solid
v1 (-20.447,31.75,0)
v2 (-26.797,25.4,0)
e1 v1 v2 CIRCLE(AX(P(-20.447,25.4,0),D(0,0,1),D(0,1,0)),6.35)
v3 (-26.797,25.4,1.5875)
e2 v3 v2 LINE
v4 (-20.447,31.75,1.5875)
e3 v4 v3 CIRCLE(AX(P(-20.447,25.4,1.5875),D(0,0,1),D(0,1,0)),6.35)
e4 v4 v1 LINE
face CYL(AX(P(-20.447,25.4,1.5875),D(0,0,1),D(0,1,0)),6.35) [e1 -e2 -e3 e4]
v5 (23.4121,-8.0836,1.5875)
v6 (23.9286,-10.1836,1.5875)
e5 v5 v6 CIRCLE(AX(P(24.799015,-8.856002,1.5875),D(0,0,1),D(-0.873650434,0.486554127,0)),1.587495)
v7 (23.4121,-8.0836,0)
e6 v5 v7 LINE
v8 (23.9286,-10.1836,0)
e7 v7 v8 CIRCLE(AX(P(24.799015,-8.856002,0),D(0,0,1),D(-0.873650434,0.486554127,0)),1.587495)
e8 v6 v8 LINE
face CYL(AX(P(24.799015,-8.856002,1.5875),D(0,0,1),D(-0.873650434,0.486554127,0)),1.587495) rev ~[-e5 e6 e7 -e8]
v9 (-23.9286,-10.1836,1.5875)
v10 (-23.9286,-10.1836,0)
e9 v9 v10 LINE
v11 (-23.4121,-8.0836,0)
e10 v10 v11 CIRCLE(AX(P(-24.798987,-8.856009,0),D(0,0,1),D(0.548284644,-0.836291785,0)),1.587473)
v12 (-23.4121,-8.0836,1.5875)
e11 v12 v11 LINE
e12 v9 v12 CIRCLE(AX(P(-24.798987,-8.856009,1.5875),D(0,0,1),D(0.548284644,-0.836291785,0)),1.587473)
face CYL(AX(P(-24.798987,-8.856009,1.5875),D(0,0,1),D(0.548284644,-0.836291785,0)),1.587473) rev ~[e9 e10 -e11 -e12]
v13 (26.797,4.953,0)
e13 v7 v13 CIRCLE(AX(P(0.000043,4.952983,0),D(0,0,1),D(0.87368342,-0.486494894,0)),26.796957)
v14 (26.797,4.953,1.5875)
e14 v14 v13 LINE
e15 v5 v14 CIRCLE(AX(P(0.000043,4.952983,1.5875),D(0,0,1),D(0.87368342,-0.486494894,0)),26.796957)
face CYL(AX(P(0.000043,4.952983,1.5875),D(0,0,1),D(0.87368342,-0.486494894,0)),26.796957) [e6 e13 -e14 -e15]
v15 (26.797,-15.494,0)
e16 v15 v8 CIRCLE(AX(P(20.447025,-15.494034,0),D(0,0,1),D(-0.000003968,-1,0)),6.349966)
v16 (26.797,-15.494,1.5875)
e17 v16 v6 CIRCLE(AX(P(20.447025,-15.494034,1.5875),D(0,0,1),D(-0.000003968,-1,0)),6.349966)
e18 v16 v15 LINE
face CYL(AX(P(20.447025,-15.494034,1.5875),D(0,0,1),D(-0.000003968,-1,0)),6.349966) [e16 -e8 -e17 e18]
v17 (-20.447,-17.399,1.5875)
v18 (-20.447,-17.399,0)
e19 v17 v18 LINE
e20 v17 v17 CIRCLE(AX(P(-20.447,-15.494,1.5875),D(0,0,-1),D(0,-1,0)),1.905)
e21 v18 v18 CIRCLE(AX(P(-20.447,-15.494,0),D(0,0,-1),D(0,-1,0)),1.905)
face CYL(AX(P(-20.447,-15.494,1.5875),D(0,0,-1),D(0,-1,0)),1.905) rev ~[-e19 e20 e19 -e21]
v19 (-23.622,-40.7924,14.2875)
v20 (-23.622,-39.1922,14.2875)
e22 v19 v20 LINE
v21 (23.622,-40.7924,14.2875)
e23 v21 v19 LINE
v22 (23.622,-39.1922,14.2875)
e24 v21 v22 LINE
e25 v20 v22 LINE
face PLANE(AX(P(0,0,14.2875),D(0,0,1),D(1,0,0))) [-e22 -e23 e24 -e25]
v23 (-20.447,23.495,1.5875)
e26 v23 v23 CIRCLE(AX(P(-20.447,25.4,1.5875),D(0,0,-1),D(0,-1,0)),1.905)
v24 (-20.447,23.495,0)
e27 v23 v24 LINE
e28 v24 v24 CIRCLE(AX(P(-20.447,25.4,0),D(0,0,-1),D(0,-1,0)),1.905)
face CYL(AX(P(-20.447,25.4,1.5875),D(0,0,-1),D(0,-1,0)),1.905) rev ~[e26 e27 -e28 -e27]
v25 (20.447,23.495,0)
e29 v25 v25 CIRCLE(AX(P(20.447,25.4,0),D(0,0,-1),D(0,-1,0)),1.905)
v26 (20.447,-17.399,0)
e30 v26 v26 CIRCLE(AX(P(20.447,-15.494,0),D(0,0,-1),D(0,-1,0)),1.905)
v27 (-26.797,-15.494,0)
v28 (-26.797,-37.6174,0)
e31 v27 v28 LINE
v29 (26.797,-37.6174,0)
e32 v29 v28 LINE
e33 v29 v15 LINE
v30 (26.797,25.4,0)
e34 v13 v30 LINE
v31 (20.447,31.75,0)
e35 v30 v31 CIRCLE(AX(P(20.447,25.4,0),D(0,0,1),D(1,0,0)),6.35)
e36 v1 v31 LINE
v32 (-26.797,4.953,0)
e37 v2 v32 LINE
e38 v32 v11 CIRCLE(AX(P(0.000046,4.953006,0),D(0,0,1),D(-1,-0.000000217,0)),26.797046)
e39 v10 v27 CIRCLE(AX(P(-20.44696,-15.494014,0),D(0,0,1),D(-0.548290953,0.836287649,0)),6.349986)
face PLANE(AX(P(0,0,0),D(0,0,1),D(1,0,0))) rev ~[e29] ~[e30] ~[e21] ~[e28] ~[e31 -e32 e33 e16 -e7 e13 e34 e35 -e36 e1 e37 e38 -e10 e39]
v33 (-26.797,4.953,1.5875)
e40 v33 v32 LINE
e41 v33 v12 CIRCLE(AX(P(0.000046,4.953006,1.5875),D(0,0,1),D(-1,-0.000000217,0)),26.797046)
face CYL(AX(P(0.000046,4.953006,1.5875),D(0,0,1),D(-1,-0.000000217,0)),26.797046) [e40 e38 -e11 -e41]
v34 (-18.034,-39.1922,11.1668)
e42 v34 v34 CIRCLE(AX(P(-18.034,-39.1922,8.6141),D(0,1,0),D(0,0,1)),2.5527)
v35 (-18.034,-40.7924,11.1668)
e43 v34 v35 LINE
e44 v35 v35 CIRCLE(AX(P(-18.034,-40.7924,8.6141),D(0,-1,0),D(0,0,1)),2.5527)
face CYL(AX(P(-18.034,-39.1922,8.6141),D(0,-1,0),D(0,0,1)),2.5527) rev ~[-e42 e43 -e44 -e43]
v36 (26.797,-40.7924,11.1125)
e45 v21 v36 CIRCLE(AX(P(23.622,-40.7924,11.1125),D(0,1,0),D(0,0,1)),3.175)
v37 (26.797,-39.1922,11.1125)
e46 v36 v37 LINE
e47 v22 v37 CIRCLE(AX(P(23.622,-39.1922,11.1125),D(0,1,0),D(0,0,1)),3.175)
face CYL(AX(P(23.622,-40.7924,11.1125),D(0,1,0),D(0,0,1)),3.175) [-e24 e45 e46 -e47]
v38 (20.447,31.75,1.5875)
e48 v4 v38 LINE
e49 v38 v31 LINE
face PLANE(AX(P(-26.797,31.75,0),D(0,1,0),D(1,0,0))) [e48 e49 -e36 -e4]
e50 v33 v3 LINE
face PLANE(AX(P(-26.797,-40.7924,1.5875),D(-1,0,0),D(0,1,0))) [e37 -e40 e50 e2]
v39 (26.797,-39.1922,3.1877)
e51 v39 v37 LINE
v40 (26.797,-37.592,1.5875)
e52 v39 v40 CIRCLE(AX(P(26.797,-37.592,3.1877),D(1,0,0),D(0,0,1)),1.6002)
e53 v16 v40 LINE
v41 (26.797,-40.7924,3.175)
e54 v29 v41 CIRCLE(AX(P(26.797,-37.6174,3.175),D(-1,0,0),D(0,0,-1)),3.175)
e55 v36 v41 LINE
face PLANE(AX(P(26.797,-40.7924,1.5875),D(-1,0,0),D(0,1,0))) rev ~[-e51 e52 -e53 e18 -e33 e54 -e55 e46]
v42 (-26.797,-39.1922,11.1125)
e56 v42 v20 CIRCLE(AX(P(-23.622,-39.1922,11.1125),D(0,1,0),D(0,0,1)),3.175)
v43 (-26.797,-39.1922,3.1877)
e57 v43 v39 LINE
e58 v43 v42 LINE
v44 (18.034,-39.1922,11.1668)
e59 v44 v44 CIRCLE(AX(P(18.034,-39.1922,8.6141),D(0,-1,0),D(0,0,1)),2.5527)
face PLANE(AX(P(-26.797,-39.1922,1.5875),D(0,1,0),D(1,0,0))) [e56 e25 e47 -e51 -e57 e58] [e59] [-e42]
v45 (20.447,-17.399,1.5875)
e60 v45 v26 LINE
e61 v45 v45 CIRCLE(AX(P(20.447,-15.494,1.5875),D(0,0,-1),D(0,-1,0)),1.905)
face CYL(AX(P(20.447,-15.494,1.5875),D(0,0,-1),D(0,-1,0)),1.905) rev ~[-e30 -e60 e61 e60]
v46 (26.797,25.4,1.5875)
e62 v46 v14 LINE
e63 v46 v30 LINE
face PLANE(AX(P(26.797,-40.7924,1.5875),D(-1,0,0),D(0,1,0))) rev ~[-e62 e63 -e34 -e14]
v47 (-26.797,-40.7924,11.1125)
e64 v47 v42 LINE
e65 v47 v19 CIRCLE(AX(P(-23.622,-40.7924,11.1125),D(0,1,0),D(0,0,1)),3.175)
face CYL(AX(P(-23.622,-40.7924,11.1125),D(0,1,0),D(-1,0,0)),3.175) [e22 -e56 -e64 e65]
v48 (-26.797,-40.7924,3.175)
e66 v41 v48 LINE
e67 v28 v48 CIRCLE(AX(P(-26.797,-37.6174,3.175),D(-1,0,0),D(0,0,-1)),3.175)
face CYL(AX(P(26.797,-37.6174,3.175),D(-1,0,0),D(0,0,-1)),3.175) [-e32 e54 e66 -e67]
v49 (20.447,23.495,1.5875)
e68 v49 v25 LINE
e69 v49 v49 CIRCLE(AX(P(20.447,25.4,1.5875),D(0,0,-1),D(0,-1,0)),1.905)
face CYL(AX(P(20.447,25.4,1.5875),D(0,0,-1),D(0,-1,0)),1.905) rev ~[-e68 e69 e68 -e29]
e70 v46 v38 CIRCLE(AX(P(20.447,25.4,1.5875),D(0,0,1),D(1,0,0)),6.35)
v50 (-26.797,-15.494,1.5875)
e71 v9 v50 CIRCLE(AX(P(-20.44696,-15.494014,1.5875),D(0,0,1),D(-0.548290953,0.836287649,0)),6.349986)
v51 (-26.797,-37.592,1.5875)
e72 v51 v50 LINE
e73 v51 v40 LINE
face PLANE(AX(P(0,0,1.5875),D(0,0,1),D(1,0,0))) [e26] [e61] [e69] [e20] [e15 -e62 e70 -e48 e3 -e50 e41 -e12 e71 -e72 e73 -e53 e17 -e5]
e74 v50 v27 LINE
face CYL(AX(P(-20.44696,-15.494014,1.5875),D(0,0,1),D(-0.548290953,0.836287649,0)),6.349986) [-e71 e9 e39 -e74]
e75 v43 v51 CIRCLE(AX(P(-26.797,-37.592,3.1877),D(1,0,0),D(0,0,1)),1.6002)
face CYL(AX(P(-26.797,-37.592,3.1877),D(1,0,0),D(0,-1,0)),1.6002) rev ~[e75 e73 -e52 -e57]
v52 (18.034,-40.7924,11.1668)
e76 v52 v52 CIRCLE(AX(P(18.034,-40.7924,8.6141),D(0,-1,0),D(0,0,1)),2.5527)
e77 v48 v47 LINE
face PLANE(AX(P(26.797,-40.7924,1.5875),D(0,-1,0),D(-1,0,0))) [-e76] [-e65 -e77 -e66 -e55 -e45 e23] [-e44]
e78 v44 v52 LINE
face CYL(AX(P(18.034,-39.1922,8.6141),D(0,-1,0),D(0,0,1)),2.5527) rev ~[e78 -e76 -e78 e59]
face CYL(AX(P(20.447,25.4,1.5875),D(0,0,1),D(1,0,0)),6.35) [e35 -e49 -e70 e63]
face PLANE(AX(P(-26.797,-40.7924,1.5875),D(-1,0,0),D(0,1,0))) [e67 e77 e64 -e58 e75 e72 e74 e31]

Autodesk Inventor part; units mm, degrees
ref_plane "XZ Plane" through (0, 0, 0) normal (0, 1, 0) x (-1, 0, 0)
ref_plane "XY Plane" through (0, 0, 0) normal (0, 0, 1) x (1, 0, 0)
sketch "Sketch1" plane through (0, 0, 0) normal (0, 0, 1) x (1, 0, 0)
  line L0 (-26.797, 31.75) -> (26.797, 31.75)
  line L1 (26.797, 31.75) -> (26.797, -31.75)
  line L2 (26.797, -31.75) -> (-26.797, -31.75)
  line L3 (-26.797, -31.75) -> (-26.797, 31.75)
  point P0 (0, 0)
  point P1 (-26.797, 0)
  point P2 (0, 31.75)
  dimension "d0" = 53.594
  dimension "d1" = 63.5
extrude "Extrusion1" add sketch "Sketch1" along normal blind 1.5875
sketch "Sketch9" plane through (0, 0, 1.5875) normal (0, 0, 1) x (1, 0, 0)
  line L0 (26.797, 31.75) -> (26.797, -31.75) projected
  line L1 (-26.797, -31.75) -> (-26.797, 31.75) projected
  line L2 (26.797, -31.75) -> (-26.797, -31.75) projected
  line L3 (-26.797, -31.75) -> (26.797, -31.75)
  line L4 (26.797, -31.75) -> (26.797, -40.7924)
  line L5 (26.797, -40.7924) -> (-26.797, -40.7924)
  line L6 (-26.797, -40.7924) -> (-26.797, -31.75)
  line L7 (-26.797, 31.75) -> (26.797, 31.75) projected
  point P0 (0, 0)
  dimension "d60" = 72.5424
extrude "Extrusion5" add sketch "Sketch9" against normal up to surface (1.5875 mm away) contours L4 L5 L6 L2
sketch "Sketch2" plane through (0, 0, 1.5875) normal (0, 0, 1) x (1, 0, 0)
  line L0 (-26.797, -39.1922) -> (26.797, -39.1922)
  line L1 (26.797, -40.7924) -> (-26.797, -40.7924)
  line L2 (26.797, -40.7924) -> (26.797, 31.75) projected
  line L3 (-26.797, -40.7924) -> (26.797, -40.7924) projected
  line L4 (-26.797, -40.7924) -> (-26.797, -39.1922)
  line L5 (26.797, -40.7924) -> (26.797, -39.1922)
  point P0 (-26.797, -31.75)
  point P1 (0, 0)
  dimension "d4" = 53.594
  dimension "d59" = 1.6002
extrude "Extrusion2" add sketch "Sketch2" along normal blind 12.7
sketch "Sketch6" plane through (0, 0, 1.5875) normal (0, 0, 1) x (1, 0, 0)
  line L0 (26.797, 31.75) -> (26.797, -29.3687) projected
  line L1 (-26.797, 31.75) -> (26.797, 31.75) projected
  line L2 (-26.797, -29.3687) -> (-26.797, 31.75) projected
  arc A0 (20.447, -21.844) -> (23.9286, -10.1836) centre (20.447, -15.494) ccw projected
  arc A1 (23.4121, -8.0836) -> (23.9286, -10.1836) centre (24.799, -8.856) ccw projected
  arc A2 (23.4121, -8.0836) -> (26.797, 4.953) centre (0, 4.953) ccw projected
  line L3 (26.797, 25.4) -> (26.797, 4.953) projected
  arc A3 (26.797, 25.4) -> (20.447, 31.75) centre (20.447, 25.4) ccw projected
  line L4 (14.199, 31.75) -> (20.447, 31.75) projected
  line L5 (-14.199, 31.75) -> (14.199, 31.75) projected
  line L6 (-20.447, 31.75) -> (-14.199, 31.75) projected
  arc A4 (-20.447, 31.75) -> (-26.797, 25.4) centre (-20.447, 25.4) ccw projected
  line L7 (-26.797, 4.953) -> (-26.797, 25.4) projected
  arc A5 (-26.797, 4.953) -> (-23.4121, -8.0836) centre (0, 4.953) ccw projected
  arc A6 (-23.9286, -10.1836) -> (-23.4121, -8.0836) centre (-24.799, -8.856) ccw projected
  arc A7 (-23.9286, -10.1836) -> (-20.447, -21.844) centre (-20.447, -15.494) ccw projected
  line L8 (20.447, -21.844) -> (-20.447, -21.844) projected
  arc A8 (-23.9286, -10.1836) -> (-26.797, -15.494) centre (-20.447, -15.494) ccw
  arc A9 (26.797, -15.494) -> (23.9286, -10.1836) centre (20.447, -15.494) ccw
  arc A10 (23.4121, -8.0836) -> (23.9286, -10.1836) centre (24.799, -8.856) ccw
  arc A11 (-23.9286, -10.1836) -> (-23.4121, -8.0836) centre (-24.799, -8.856) ccw
  point P0 (0, 0)
extrude "Extrusion4" cut sketch "Sketch6" against normal up to next contours L0 A3 L1 | L0 A0 A1 A2 | A4 L2 L1 | L2 A5 A6 A7
sketch "Sketch7" plane through (0, 0, 1.5875) normal (0, 0, 1) x (1, 0, 0)
  arc A0 (26.797, 25.4) -> (20.447, 31.75) centre (20.447, 25.4) ccw projected
  arc A1 (-20.447, 31.75) -> (-26.797, 25.4) centre (-20.447, 25.4) ccw projected
  arc A2 (-23.9286, -10.1836) -> (-26.797, -15.494) centre (-20.447, -15.494) ccw projected
  arc A3 (26.797, -15.494) -> (23.9286, -10.1836) centre (20.447, -15.494) ccw projected
  point P0 (0, 0)
hole "Hole3" at (-20.447, 25.4, 1.5875) at (20.447, 25.4, 1.5875) at (20.447, -15.494, 1.5875) at (-20.447, -15.494, 1.5875) direction (0, 0, -1) diameter 3.81 end through all clearance for "Oval Head Machine Screw" size "#6" standard "Ansi Unified Screw Threads"
ref_plane "Work Plane1" through (-26.797, -30.1625, 2.3812) normal (0, 1, 0) x (1, 0, 0)
fillet "Fillet3" radius 1.6002 1 edges at (0, -39.1922, 1.5875)
fillet "Fillet4" radius 3.175 1 edges at (0, -40.7924, 0)
fillet "Fillet5" radius 3.175 2 edges at (-26.797, -39.9923, 14.2875) (26.797, -39.9923, 14.2875)
sketch "Sketch10" plane through (-26.797, -39.1922, 3.1877) normal (0, 1, 0) x (1, 0, 0)
  circle A0 centre (44.831, -5.4264) radius 2.4116 projected
  point P0 (26.797, 3.1877)
hole "Hole6" at (18.034, -39.1922, 8.6141) direction (0, -1, 0) diameter 5.1054 end through all clearance for "Flat Head Machine Screw (82)" size "#10" standard "Ansi Unified Screw Threads"
mirror "Mirror1" about plane through (0, 0, 0) normal (1, 0, 0) of "Hole6"
properties part number "Pneumatics_VIAIR_0090_01" material "Aluminum-6061"
